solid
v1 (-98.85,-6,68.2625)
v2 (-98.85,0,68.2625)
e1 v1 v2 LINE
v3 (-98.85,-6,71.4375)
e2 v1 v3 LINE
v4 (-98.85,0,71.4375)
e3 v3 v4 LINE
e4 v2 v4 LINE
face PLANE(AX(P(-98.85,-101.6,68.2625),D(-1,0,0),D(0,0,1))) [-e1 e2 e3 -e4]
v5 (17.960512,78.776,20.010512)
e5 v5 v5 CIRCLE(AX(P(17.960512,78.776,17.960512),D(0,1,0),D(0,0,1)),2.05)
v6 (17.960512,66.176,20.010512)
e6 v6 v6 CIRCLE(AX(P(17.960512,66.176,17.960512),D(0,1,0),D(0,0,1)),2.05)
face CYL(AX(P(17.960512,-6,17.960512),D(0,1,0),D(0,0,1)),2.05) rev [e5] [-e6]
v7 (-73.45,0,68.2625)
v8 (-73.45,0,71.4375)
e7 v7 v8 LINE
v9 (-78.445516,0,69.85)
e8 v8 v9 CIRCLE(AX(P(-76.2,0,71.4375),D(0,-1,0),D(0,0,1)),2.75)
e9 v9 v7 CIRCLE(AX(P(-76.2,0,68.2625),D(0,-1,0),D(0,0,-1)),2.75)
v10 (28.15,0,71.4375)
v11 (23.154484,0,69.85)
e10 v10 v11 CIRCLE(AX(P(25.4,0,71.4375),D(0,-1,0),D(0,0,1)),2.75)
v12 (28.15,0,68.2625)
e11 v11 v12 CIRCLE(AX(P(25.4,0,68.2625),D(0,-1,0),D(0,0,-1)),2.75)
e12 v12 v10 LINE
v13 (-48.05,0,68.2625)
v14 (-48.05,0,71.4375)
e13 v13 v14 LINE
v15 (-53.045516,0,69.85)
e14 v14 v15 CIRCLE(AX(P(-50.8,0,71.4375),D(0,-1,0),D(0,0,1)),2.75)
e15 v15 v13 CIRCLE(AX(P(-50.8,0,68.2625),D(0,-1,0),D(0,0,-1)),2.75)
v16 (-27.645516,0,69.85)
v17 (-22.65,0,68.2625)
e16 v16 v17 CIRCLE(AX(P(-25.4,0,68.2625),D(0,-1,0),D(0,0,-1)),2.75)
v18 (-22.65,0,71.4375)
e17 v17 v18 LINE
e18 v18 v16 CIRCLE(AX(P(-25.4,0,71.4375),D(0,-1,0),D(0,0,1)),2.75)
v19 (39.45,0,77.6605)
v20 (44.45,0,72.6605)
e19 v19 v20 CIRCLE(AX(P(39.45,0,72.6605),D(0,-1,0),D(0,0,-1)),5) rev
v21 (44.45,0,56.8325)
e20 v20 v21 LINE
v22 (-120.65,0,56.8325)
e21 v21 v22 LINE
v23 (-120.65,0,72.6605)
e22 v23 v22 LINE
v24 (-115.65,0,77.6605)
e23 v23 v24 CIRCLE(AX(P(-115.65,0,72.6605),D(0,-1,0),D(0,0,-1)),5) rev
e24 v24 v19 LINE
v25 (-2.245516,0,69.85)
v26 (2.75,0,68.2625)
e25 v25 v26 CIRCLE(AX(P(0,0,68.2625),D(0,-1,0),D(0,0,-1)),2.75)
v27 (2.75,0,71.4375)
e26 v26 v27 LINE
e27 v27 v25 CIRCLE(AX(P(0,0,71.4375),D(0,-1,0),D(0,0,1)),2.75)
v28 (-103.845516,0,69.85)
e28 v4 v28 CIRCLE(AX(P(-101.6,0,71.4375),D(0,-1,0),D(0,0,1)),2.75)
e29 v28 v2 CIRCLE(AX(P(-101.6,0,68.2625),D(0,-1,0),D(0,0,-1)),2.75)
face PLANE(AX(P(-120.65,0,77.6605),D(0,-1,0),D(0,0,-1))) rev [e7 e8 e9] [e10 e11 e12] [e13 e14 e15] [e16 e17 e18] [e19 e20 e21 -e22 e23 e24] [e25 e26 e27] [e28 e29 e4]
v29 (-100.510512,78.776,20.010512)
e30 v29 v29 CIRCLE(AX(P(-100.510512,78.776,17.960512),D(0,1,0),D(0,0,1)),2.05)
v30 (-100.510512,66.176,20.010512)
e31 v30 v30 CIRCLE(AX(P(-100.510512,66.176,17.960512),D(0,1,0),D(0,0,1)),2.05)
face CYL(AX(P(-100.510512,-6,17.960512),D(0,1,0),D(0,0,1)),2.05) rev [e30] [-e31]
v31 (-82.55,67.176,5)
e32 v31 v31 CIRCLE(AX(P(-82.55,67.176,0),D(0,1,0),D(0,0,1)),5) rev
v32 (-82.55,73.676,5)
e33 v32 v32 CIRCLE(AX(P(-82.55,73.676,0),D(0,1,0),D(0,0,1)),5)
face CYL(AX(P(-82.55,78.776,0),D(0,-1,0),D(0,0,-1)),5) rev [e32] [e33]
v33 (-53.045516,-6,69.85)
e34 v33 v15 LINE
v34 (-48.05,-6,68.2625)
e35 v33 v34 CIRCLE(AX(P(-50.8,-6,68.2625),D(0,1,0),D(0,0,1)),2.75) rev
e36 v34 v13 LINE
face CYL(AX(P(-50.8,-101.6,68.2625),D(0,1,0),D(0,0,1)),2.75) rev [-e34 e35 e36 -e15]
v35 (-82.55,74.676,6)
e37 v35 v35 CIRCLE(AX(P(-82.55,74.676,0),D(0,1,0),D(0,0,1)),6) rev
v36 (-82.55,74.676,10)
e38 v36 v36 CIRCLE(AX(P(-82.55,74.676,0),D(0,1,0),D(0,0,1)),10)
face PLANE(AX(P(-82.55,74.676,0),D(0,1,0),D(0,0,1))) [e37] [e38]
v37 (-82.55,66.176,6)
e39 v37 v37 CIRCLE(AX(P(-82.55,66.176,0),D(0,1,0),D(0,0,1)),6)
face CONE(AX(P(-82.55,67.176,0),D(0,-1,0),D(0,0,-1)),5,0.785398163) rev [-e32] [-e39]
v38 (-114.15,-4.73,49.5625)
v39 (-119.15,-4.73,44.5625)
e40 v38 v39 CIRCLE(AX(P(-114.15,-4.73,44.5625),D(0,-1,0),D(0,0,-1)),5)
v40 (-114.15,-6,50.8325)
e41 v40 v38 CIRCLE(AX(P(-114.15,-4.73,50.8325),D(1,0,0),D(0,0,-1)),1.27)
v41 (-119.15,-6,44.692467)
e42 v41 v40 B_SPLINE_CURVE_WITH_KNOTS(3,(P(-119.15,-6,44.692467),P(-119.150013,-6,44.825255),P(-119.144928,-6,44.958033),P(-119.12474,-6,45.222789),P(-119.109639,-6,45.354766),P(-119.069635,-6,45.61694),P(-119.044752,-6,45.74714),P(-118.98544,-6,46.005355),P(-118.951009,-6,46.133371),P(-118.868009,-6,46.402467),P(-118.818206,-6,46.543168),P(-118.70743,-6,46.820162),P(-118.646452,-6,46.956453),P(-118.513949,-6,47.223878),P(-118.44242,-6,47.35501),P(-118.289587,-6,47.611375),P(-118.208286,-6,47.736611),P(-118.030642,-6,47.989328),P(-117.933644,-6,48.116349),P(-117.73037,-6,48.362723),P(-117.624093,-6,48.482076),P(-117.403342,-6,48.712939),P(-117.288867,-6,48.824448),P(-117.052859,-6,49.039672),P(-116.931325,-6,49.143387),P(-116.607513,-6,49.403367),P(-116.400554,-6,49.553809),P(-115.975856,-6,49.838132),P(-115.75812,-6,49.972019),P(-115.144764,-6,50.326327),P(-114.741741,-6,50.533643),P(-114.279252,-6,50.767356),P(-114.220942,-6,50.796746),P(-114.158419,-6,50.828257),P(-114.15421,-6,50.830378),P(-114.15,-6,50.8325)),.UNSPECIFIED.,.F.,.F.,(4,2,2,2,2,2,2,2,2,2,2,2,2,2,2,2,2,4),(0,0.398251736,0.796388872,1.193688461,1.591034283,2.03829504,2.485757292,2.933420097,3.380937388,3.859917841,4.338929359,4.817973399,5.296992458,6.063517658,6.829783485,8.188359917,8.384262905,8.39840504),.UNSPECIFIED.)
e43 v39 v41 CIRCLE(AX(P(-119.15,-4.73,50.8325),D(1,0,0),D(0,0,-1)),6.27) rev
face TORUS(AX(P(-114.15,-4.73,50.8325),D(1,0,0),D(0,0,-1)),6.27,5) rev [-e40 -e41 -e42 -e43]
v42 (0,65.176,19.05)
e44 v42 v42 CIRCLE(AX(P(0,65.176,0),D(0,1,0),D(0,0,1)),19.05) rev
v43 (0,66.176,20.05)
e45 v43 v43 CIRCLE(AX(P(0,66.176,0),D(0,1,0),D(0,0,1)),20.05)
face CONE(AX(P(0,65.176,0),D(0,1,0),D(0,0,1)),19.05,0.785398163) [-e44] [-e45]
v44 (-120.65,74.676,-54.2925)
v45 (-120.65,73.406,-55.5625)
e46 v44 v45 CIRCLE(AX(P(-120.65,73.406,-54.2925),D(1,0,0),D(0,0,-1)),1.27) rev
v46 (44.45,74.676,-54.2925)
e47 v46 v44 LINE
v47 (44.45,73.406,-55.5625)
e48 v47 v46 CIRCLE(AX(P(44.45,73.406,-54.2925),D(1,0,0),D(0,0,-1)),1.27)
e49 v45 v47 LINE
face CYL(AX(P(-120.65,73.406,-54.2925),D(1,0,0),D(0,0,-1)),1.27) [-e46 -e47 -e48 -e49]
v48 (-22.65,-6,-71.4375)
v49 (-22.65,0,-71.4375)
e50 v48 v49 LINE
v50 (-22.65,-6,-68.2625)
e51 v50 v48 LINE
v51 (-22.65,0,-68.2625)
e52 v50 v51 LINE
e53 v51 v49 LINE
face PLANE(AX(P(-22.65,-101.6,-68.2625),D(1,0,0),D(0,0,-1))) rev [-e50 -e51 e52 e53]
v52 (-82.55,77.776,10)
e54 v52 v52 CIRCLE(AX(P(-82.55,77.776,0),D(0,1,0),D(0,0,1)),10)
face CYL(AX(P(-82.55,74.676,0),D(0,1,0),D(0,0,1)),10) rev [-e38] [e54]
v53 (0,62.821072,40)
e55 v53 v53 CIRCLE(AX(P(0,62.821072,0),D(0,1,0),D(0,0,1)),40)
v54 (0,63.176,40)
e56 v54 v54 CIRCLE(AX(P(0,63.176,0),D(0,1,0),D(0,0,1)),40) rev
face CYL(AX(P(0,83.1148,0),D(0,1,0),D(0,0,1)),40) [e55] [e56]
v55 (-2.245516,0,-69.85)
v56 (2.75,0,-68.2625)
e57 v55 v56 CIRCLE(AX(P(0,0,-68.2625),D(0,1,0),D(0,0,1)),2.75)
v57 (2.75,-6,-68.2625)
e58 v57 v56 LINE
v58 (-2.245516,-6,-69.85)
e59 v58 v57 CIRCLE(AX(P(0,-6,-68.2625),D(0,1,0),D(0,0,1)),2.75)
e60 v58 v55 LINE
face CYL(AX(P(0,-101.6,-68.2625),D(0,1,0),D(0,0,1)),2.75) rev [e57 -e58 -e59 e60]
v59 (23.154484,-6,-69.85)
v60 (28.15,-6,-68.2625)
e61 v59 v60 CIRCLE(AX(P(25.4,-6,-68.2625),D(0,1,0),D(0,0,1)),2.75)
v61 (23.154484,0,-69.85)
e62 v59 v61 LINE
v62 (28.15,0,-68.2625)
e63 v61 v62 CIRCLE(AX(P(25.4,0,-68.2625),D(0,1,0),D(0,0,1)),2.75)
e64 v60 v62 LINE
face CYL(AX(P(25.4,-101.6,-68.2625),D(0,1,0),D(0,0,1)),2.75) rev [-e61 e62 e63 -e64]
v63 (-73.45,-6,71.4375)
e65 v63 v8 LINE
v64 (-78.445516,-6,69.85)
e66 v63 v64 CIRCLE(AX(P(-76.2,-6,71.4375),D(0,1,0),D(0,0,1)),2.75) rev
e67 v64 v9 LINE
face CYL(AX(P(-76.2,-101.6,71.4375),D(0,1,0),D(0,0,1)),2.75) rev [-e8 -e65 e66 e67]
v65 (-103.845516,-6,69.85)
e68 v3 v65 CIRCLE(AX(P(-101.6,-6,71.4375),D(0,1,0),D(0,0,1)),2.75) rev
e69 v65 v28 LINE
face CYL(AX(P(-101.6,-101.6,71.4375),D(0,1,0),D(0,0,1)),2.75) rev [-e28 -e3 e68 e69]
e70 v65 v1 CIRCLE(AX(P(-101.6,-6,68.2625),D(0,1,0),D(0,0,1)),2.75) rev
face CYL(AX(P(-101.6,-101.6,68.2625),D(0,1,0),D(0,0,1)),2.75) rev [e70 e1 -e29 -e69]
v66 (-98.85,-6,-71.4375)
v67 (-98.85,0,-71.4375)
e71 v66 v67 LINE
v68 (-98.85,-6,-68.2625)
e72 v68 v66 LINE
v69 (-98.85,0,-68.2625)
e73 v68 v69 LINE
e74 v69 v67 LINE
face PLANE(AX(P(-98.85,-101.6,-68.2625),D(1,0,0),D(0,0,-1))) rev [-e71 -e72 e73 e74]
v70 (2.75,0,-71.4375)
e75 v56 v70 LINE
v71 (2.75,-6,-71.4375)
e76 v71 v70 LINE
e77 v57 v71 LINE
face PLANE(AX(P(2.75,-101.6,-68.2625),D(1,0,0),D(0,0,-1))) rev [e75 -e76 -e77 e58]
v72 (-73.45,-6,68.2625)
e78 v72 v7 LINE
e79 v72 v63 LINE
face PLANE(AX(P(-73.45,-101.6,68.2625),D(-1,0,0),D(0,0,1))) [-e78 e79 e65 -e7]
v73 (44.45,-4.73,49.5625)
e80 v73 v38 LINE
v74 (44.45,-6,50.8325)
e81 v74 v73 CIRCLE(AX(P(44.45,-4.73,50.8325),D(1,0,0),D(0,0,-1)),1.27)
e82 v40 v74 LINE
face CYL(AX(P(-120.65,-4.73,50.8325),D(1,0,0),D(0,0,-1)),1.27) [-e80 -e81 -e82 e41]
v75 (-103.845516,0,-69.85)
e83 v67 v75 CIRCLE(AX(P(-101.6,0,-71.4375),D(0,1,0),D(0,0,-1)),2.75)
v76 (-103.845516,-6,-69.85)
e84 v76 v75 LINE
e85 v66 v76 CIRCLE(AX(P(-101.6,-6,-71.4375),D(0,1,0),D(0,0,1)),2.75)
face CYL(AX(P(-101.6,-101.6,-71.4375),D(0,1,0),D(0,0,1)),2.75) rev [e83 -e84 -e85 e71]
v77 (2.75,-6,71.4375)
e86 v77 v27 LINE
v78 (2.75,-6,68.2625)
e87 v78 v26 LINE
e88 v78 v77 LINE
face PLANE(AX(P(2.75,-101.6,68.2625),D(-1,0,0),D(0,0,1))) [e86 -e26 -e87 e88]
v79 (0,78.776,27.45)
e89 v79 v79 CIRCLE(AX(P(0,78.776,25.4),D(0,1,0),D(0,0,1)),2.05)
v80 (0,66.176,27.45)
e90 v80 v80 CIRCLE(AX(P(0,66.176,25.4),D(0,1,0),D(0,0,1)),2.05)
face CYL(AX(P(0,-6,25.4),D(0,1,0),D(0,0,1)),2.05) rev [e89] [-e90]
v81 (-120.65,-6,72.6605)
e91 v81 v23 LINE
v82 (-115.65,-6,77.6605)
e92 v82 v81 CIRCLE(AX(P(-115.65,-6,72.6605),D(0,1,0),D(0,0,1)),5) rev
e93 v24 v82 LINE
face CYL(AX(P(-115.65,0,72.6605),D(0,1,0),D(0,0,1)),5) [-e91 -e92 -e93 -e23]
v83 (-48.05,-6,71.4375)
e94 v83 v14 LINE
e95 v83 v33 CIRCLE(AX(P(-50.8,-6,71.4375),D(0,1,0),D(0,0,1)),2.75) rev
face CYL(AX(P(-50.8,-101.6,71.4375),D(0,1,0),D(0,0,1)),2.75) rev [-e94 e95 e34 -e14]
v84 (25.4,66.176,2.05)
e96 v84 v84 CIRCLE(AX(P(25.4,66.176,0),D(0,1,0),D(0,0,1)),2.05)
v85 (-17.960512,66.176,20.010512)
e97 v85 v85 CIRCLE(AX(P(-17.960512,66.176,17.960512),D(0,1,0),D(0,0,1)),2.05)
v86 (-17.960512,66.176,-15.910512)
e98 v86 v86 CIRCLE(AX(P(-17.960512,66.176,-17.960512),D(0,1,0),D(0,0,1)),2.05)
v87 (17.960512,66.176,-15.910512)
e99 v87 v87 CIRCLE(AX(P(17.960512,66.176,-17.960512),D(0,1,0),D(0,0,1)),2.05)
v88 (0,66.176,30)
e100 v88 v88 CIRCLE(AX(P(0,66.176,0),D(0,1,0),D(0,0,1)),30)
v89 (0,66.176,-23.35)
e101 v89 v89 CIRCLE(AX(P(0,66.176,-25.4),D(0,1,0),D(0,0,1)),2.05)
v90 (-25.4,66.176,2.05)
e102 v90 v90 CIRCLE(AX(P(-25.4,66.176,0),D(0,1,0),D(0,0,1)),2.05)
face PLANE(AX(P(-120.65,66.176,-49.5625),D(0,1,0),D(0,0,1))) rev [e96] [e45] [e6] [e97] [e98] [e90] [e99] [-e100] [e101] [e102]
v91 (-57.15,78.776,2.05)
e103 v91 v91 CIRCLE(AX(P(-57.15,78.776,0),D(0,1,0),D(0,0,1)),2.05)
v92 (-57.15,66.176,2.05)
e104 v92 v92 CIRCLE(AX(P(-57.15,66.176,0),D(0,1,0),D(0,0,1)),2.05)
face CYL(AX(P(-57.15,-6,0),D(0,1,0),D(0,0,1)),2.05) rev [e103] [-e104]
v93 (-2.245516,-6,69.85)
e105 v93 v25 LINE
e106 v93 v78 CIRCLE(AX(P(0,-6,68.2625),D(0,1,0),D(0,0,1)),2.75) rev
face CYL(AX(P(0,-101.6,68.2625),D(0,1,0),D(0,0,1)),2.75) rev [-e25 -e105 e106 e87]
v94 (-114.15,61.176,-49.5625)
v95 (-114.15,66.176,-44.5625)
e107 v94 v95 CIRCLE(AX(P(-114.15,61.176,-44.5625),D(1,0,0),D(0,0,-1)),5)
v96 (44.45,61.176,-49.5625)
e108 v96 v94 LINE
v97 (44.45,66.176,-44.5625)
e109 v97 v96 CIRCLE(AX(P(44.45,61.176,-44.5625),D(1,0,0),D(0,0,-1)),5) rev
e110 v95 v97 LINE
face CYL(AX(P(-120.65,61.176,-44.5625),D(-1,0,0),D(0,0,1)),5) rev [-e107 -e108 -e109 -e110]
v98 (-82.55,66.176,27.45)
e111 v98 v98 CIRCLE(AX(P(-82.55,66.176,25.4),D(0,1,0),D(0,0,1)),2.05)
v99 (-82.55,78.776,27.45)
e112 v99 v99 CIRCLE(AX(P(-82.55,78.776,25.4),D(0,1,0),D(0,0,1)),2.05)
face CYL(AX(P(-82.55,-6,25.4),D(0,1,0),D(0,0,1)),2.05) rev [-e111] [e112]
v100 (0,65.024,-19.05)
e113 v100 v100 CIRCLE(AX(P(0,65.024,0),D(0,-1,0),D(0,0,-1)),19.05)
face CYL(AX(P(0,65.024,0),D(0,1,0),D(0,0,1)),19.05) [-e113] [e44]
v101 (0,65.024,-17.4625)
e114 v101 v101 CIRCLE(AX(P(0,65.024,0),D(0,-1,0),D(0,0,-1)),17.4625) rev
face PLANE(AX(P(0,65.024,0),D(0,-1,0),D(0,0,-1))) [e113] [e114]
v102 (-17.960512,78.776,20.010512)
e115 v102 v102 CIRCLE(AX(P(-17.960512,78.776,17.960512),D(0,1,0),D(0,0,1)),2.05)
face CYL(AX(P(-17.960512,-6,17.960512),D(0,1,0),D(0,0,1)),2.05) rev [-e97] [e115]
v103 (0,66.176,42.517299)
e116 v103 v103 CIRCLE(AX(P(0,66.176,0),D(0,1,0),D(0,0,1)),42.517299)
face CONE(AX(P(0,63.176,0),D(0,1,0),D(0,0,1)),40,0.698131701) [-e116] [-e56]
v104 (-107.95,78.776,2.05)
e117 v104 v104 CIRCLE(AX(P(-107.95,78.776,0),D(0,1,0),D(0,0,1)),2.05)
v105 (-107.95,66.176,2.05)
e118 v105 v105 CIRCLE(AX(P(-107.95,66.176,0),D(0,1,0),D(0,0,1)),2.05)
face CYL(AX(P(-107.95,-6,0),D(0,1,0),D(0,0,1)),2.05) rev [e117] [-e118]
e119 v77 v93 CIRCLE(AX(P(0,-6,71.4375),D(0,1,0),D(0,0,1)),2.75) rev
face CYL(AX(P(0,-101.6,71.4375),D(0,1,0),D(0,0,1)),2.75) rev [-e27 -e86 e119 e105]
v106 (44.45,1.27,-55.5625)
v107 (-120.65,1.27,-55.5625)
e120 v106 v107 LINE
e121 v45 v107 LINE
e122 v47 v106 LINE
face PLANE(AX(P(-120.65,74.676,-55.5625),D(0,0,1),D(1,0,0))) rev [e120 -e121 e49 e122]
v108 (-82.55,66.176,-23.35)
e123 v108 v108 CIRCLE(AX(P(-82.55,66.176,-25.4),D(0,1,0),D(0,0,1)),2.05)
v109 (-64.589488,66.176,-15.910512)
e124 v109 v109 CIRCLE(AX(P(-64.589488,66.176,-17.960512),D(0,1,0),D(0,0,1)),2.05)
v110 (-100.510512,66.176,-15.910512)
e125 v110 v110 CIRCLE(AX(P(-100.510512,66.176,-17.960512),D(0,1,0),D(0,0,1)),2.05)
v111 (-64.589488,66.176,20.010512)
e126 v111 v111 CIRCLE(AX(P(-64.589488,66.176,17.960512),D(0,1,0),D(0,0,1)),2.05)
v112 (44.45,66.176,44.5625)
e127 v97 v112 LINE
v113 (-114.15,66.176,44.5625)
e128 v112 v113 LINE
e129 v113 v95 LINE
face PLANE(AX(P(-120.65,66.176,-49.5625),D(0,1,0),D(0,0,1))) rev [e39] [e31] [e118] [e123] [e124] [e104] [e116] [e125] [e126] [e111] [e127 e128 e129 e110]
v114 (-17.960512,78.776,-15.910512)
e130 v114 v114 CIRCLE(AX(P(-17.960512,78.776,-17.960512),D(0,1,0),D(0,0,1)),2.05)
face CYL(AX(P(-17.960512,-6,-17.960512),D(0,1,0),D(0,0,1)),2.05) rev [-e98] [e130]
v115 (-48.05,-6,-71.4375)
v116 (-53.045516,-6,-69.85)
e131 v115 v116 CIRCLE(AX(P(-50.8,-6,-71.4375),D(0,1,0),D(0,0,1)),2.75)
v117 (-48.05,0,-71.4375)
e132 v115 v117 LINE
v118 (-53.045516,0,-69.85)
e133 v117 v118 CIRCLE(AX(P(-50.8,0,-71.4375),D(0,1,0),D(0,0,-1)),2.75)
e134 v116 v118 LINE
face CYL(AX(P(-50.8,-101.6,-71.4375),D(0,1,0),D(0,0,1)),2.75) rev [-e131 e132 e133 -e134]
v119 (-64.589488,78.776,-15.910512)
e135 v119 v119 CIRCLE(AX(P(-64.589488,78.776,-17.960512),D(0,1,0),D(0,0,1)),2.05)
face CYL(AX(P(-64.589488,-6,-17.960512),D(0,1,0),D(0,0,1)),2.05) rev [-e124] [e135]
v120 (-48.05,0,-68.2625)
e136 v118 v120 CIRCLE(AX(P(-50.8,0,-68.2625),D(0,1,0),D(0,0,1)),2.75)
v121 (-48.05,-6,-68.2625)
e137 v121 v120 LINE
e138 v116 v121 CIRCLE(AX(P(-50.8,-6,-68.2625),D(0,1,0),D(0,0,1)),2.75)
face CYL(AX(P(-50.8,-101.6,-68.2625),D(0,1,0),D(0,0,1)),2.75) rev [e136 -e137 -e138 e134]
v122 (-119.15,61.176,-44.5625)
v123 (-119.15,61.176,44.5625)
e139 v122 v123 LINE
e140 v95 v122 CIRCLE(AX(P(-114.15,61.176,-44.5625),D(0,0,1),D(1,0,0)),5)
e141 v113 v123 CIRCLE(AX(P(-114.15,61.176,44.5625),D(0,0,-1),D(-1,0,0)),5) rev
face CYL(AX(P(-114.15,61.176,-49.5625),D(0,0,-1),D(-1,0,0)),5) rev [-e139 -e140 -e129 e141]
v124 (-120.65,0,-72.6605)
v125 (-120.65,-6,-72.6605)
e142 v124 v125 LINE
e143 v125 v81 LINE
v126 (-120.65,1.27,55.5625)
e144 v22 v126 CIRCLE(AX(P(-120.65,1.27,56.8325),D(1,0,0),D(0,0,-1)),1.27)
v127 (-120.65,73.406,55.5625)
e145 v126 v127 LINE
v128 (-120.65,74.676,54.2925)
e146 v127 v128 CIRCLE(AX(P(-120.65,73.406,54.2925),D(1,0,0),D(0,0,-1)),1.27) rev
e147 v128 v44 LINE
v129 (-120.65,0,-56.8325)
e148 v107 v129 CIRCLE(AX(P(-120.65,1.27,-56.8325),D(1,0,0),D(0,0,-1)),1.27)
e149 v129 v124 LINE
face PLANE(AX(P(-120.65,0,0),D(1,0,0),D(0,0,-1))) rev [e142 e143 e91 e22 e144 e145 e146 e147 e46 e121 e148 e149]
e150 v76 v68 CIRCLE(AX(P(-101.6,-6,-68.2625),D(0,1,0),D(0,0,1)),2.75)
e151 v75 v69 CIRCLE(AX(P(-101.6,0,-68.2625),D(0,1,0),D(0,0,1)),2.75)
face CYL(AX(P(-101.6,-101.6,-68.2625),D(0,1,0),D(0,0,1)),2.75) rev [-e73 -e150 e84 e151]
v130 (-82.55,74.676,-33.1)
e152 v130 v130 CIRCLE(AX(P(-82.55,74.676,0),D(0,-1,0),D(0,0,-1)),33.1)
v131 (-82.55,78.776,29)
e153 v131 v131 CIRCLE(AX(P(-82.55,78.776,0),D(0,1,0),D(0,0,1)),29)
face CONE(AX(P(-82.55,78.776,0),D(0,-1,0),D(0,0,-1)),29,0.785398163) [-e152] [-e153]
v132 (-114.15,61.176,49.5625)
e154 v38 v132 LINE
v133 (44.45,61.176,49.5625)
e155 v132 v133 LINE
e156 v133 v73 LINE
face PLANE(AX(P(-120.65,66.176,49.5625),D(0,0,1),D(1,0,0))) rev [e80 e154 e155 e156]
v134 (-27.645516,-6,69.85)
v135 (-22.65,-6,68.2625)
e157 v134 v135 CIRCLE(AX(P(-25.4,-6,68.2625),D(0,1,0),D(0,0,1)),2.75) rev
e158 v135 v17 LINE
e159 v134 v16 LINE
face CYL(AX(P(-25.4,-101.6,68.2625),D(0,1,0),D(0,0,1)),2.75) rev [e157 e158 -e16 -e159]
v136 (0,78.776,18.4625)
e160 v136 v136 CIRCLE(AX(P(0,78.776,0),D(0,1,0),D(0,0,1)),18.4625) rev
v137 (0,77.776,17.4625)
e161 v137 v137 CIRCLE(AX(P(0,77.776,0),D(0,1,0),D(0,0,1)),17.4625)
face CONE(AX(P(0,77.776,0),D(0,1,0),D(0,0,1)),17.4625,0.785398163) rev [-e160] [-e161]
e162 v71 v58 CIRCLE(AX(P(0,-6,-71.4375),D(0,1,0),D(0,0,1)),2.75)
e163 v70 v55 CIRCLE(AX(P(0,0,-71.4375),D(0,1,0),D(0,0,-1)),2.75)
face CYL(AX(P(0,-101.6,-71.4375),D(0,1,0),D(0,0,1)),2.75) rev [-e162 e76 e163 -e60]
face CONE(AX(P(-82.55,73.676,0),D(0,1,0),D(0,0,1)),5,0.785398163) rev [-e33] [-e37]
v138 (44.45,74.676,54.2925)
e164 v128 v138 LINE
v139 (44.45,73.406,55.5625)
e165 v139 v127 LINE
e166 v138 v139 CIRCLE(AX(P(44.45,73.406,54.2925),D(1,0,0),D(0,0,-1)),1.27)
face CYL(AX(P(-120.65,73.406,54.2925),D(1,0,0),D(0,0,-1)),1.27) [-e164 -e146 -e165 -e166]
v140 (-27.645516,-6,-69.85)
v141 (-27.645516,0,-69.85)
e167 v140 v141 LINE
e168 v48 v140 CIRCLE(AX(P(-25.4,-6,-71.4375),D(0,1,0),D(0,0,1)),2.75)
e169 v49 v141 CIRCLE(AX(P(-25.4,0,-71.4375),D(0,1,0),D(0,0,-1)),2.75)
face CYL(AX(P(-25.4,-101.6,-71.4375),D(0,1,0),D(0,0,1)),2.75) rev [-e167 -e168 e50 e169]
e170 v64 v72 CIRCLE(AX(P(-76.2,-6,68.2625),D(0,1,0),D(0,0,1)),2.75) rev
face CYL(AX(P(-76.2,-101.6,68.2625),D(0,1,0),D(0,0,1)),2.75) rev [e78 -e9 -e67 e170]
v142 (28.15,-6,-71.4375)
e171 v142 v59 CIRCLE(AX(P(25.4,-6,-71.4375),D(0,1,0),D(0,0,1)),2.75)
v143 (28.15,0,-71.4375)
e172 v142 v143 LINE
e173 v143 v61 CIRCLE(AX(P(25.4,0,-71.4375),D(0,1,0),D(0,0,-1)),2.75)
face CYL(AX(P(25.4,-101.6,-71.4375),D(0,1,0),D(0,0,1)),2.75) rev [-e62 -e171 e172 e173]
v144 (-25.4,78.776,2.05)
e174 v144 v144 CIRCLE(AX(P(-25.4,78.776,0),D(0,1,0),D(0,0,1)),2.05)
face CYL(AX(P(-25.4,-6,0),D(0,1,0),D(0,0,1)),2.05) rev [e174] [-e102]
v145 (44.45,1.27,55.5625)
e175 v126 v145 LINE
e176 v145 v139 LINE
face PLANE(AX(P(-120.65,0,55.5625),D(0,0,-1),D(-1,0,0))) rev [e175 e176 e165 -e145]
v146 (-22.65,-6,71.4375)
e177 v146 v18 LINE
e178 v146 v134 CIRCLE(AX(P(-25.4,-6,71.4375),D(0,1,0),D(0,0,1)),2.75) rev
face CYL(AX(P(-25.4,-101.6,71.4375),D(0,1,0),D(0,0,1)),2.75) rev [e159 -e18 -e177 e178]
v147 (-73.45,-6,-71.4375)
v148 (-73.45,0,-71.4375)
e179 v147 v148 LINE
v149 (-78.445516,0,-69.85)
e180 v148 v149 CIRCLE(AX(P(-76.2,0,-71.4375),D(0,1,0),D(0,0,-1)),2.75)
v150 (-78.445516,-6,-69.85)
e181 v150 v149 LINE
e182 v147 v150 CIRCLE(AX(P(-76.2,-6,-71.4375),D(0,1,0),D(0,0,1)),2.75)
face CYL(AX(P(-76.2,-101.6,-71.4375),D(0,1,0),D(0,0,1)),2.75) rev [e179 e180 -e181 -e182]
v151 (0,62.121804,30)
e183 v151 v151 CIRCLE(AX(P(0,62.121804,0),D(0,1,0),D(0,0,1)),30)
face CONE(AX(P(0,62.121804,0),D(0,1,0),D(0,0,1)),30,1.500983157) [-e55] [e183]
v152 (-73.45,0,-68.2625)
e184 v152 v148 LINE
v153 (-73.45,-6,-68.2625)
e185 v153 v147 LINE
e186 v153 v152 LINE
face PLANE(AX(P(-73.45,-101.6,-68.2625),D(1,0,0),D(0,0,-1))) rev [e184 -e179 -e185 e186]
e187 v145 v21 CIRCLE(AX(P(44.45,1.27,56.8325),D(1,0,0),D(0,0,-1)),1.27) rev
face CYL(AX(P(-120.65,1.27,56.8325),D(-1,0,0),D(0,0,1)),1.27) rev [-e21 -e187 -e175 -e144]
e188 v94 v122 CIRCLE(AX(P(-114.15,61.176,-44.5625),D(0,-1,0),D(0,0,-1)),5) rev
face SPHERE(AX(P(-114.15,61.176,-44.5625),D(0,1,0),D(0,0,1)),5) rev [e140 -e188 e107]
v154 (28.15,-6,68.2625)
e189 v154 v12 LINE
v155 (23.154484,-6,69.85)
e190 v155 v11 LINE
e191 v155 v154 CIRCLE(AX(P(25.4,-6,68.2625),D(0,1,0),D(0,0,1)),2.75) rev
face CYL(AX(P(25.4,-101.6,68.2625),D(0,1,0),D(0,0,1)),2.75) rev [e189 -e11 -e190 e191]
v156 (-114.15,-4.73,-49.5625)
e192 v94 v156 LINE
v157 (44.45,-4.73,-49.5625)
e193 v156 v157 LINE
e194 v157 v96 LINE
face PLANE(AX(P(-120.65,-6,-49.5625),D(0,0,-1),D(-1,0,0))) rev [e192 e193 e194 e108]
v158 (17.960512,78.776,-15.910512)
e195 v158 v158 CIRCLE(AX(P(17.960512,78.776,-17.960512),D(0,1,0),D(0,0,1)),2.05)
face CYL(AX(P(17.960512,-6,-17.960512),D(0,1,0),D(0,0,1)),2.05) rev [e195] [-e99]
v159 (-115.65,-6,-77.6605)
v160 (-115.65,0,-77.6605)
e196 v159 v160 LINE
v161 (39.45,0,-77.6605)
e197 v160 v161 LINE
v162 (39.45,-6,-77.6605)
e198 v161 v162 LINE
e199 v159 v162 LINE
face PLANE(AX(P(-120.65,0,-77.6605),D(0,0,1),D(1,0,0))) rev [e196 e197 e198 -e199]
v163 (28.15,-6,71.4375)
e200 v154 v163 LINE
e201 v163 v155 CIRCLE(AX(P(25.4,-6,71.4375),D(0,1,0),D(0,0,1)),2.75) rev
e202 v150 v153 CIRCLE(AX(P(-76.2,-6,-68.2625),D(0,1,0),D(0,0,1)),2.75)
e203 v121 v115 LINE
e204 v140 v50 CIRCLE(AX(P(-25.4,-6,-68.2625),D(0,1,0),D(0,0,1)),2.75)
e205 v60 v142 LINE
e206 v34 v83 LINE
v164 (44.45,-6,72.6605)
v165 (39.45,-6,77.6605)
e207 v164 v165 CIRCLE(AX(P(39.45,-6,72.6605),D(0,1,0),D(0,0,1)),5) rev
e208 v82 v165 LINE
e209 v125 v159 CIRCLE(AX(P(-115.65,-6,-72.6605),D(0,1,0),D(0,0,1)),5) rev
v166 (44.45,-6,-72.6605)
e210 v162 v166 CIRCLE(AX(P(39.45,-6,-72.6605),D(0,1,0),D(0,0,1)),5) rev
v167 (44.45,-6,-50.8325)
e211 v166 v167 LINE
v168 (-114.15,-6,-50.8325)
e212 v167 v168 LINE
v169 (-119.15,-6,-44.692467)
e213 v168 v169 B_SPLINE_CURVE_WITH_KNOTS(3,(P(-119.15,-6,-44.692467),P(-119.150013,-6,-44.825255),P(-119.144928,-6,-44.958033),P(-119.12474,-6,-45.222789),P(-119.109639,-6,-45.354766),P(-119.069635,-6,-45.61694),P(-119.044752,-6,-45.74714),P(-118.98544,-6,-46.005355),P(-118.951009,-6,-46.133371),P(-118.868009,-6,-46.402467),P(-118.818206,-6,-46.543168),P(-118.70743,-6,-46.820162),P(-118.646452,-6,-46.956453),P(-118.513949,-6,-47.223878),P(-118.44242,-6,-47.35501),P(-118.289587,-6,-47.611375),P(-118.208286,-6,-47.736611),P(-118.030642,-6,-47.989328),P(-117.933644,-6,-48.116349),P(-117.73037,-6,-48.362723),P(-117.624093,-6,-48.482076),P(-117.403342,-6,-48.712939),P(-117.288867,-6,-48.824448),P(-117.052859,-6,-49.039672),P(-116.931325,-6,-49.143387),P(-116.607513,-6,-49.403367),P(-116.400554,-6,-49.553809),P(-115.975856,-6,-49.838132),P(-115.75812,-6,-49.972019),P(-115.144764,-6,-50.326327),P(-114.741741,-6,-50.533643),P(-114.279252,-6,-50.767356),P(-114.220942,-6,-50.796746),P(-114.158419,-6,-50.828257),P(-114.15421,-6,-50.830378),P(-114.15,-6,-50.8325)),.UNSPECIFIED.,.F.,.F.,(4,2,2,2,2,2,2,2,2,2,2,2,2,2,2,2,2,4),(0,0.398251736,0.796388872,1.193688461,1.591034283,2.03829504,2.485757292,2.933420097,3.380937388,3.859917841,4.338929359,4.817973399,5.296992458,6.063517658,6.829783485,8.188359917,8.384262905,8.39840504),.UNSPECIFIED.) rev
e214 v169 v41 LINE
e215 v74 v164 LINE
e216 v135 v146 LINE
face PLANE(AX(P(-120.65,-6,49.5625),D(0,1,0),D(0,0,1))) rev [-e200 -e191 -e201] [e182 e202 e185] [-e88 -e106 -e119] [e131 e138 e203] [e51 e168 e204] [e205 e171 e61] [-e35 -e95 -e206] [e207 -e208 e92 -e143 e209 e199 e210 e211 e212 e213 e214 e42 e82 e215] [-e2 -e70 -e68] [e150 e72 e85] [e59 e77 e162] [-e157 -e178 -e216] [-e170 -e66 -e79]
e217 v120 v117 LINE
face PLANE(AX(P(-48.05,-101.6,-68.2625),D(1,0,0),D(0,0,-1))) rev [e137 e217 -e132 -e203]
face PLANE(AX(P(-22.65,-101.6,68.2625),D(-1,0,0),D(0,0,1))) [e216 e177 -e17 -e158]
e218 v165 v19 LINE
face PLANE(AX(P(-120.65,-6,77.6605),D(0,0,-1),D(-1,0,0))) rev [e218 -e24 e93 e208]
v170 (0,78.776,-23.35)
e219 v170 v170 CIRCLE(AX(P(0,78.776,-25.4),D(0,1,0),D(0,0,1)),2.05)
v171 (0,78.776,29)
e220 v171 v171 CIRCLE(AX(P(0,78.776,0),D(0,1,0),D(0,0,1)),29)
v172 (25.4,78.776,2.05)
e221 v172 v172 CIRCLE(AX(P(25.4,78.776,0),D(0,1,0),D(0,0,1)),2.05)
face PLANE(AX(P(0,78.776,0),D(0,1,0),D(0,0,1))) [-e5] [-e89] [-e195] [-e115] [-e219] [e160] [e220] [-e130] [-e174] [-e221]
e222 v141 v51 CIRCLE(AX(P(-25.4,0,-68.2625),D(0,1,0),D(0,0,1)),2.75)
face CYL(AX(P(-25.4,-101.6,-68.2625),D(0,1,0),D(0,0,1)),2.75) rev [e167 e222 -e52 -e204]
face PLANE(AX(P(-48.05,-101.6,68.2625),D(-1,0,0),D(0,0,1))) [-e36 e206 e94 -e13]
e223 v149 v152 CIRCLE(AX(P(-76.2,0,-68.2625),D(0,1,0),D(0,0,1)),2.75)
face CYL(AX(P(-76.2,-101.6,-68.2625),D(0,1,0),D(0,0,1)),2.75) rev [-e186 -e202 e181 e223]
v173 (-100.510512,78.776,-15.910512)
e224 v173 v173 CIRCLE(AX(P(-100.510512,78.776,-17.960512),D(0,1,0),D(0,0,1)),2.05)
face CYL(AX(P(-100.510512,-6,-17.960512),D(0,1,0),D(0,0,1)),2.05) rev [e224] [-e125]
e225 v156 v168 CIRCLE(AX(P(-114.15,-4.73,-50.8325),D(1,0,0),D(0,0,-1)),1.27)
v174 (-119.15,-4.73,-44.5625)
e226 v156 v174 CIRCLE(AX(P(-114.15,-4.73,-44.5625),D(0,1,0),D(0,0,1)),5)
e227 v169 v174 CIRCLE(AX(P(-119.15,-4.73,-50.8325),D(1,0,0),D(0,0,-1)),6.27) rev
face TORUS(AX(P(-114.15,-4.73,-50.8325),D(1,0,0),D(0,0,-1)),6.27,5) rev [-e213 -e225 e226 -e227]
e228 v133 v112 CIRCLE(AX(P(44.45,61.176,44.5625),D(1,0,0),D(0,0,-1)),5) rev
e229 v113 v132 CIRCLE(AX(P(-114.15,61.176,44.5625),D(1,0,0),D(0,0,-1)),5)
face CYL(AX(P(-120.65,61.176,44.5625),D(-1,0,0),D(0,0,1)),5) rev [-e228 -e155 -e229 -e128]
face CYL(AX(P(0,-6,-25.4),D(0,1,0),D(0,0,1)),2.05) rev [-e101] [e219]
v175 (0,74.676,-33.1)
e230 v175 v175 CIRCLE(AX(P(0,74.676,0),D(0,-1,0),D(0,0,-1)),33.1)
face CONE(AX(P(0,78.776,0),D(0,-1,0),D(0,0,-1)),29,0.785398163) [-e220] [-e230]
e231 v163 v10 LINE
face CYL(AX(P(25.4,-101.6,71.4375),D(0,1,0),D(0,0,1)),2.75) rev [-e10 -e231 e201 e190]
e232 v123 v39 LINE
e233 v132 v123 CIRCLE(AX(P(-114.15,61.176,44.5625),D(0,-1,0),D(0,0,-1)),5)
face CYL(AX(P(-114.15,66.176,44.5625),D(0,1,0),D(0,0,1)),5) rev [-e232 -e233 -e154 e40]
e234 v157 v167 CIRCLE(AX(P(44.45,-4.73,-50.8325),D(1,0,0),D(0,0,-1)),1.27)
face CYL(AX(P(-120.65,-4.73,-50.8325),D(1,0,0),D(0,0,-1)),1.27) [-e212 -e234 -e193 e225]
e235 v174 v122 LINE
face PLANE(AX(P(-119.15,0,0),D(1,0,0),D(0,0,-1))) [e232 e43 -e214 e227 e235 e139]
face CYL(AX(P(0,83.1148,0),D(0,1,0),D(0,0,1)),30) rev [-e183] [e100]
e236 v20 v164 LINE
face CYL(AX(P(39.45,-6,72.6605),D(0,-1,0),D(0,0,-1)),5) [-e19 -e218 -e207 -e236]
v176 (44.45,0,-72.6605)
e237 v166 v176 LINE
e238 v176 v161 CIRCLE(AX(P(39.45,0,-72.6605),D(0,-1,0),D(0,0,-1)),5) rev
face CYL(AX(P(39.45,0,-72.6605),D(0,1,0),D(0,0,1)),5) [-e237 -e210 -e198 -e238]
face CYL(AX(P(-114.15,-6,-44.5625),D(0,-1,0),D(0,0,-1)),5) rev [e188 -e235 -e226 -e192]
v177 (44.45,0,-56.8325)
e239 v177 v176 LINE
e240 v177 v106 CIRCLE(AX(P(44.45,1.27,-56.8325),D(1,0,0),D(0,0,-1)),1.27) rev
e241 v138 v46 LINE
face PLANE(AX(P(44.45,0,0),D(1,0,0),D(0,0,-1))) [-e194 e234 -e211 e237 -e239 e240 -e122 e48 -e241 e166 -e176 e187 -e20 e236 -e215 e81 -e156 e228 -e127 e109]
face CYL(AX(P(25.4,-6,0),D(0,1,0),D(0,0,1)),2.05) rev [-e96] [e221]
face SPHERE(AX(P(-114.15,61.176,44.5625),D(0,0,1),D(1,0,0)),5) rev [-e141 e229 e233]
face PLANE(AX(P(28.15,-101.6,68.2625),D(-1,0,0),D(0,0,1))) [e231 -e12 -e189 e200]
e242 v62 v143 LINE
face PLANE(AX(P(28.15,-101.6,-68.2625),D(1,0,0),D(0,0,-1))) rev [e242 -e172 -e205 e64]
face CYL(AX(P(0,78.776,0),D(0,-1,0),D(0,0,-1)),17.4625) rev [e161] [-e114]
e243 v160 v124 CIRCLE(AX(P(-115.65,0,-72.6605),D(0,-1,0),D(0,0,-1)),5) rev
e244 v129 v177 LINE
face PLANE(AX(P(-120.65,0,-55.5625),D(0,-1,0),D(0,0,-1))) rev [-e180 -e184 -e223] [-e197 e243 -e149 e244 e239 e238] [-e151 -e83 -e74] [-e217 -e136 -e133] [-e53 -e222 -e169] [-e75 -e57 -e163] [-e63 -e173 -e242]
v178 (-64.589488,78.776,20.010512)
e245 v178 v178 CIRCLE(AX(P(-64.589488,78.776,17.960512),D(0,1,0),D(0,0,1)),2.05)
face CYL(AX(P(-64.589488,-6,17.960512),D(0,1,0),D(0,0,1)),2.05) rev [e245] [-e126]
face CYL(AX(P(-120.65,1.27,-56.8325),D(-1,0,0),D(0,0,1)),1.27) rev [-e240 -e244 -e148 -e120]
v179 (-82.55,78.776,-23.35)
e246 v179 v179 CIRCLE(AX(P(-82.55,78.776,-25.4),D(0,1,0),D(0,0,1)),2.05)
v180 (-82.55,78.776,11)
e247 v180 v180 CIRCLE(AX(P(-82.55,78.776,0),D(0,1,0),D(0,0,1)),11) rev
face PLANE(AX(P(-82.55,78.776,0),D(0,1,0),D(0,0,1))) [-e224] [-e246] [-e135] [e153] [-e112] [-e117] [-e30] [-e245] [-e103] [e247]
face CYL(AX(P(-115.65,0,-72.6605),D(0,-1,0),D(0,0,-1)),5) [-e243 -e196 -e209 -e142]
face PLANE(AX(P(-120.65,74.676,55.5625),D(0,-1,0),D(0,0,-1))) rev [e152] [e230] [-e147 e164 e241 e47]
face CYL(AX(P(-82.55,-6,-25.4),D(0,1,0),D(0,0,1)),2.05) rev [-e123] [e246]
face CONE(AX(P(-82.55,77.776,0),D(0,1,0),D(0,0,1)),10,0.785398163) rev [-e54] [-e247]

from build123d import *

# Parameters (mm, degrees)
BOSS_EXTRUDE1_DEPTH        = 44.45
BOSS_EXTRUDE1_DEPTH_BACK   = 120.65
SKETCH5_W                  = 99.125
SKETCH5_H                  = 72.176
BOSS_EXTRUDE2_DEPTH        = 1.5
CUT_EXTRUDE1_DEPTH         = 101.6
SKETCH12_R                 = 29
BOSS_EXTRUDE3_DEPTH        = 4.1
CHAMFER1_SIZE              = 4.1
SKETCH10_R                 = 2.05
CUT_EXTRUDE2_DEPTH         = 164.686388977
BOSS_EXTRUDE4_START        = -8.5
SKETCH17_R                 = 19.05
BOSS_EXTRUDE4_DEPTH        = 9.652
SKETCH13_R                 = 17.4625
CUT_EXTRUDE4_DEPTH         = 164.686388977
CHAMFER3_SIZE              = 1
LPATTERN1_COUNT            = 2
LPATTERN1_PITCH            = 82.55
CHAMFER1_OF_LPATTERN1_SIZE = 4.1
SKETCH14_R                 = 5
CUT_EXTRUDE5_DEPTH         = 164.686388977
SKETCH15_R                 = 10
CUT_EXTRUDE6_DEPTH         = 4.1
FILLET1_R                  = 1.27
FILLET3_R                  = 5
CHAMFER4_SIZE              = 1
CHAMFER5_SIZE              = 3
CHAMFER5_SIZE2             = 2.517298894


# Some blends are built 0.0001 mm under size
with BuildPart() as part:
    # Sketch2 → Boss-Extrude1 (new, two sides: drawn at the far end of the back side and taken through both)
    with BuildSketch(Plane(origin=(0, 0, 0), x_dir=(0, 0, -1), z_dir=(1, 0, 0)).offset(-BOSS_EXTRUDE1_DEPTH_BACK)):
        Polygon((-77.6605, 0), (-55.5625, 0), (-55.5625, 74.676), (55.5625, 74.676), (55.5625, 0), (77.6605, 0), (77.6605, -6), (49.5625, -6), (49.5625, 66.176), (-49.5625, 66.176), (-49.5625, -6), (-77.6605, -6), align=None)
    extrude(amount=BOSS_EXTRUDE1_DEPTH + BOSS_EXTRUDE1_DEPTH_BACK)

    # Sketch5 → Boss-Extrude2 (add)
    with BuildSketch(Plane.ZY.offset(120.65)):
        with Locations((0, 30.088)):
            Rectangle(SKETCH5_W, SKETCH5_H)
    extrude(amount=-BOSS_EXTRUDE2_DEPTH)

    # Sketch4 → Cut-Extrude1 (cut)
    with BuildSketch(Plane(origin=(0, 0, 0), x_dir=(1, 0, 0), z_dir=(0, 1, 0))):
        with BuildLine():
            Line((-98.85, 68.2625), (-98.85, 71.4375))
            ThreePointArc((-98.85, 71.4375), (-102.432865533, 74.058346238), (-103.845516366, 69.85))
            ThreePointArc((-103.845516366, 69.85), (-102.432865533, 65.641653762), (-98.85, 68.2625))
        make_face()
        with BuildLine():
            Line((-73.45, 68.2625), (-73.45, 71.4375))
            ThreePointArc((-73.45, 71.4375), (-77.032865533, 74.058346238), (-78.445516366, 69.85))
            ThreePointArc((-78.445516366, 69.85), (-77.032865533, 65.641653762), (-73.45, 68.2625))
        make_face()
        with BuildLine():
            Line((-48.05, 68.2625), (-48.05, 71.4375))
            ThreePointArc((-48.05, 71.4375), (-51.632865533, 74.058346238), (-53.045516366, 69.85))
            ThreePointArc((-53.045516366, 69.85), (-51.632865533, 65.641653762), (-48.05, 68.2625))
        make_face()
        with BuildLine():
            Line((-22.65, 68.2625), (-22.65, 71.4375))
            ThreePointArc((-22.65, 71.4375), (-26.232865533, 74.058346238), (-27.645516366, 69.85))
            ThreePointArc((-27.645516366, 69.85), (-26.232865533, 65.641653762), (-22.65, 68.2625))
        make_face()
        with BuildLine():
            Line((2.75, 68.2625), (2.75, 71.4375))
            ThreePointArc((2.75, 71.4375), (-0.832865533, 74.058346238), (-2.245516366, 69.85))
            ThreePointArc((-2.245516366, 69.85), (-0.832865533, 65.641653762), (2.75, 68.2625))
        make_face()
        with BuildLine():
            Line((28.15, 68.2625), (28.15, 71.4375))
            ThreePointArc((28.15, 71.4375), (24.567134467, 74.058346238), (23.154483634, 69.85))
            ThreePointArc((23.154483634, 69.85), (24.567134467, 65.641653762), (28.15, 68.2625))
        make_face()
    cut_extrude1 = extrude(amount=-CUT_EXTRUDE1_DEPTH, mode=Mode.SUBTRACT)

    # Mirror1: Cut-Extrude1 across plane
    add(cut_extrude1.mirror(Plane.XY), mode=Mode.SUBTRACT)

    # Sketch12 → Boss-Extrude3 (add)
    with BuildSketch(Plane(origin=(0, 74.676, 0), x_dir=(1, 0, 0), z_dir=(0, 1, 0))):
        with Locations(Location((0, 0, 0), (0, 0, 270))):
            Circle(SKETCH12_R)
    boss_extrude3 = extrude(amount=BOSS_EXTRUDE3_DEPTH)

    # Chamfer1
    chamfer1_edges = [part.edges().sort_by_distance(p)[0] for p in [
        (0, 74.676, -29),
    ]]
    chamfer(chamfer1_edges, length=CHAMFER1_SIZE - 0.0001)  # a hair under: the kernel refuses the full size

    # Sketch10 → Cut-Extrude2 (cut, symmetric)
    with BuildSketch(Plane(origin=(0, 0, 0), x_dir=(1, 0, 0), z_dir=(0, 1, 0))):
        with Locations(Location((17.960512242, 17.960512242, 0), (0, 0, 270))):
            Circle(SKETCH10_R)
        with Locations(Location((25.4, 0, 0), (0, 0, 270))):
            Circle(SKETCH10_R)
        with Locations(Location((17.960512242, -17.960512242, 0), (0, 0, 270))):
            Circle(SKETCH10_R)
        with Locations(Location((0, -25.4, 0), (0, 0, 270))):
            Circle(SKETCH10_R)
        with Locations(Location((-17.960512242, -17.960512242, 0), (0, 0, 270))):
            Circle(SKETCH10_R)
        with Locations(Location((-25.4, 0, 0), (0, 0, 270))):
            Circle(SKETCH10_R)
        with Locations(Location((-17.960512242, 17.960512242, 0), (0, 0, 270))):
            Circle(SKETCH10_R)
        with Locations(Location((0, 25.4, 0), (0, 0, 270))):
            Circle(SKETCH10_R)
    cut_extrude2 = extrude(amount=CUT_EXTRUDE2_DEPTH, both=True, mode=Mode.SUBTRACT)

    # Sketch17 → Boss-Extrude4 (add)
    with BuildSketch(Plane.XZ.offset(-66.176).offset(BOSS_EXTRUDE4_START)):
        with Locations(Location((0, 0, 0), (0, 0, 90))):
            Circle(SKETCH17_R)
    extrude(amount=BOSS_EXTRUDE4_DEPTH)

    # Sketch13 → Cut-Extrude4 (cut, through all)
    with BuildSketch(Plane(origin=(0, 0, 0), x_dir=(1, 0, 0), z_dir=(0, 1, 0))):
        with Locations(Location((0, 0, 0), (0, 0, 90))):
            Circle(SKETCH13_R)
    extrude(amount=CUT_EXTRUDE4_DEPTH, mode=Mode.SUBTRACT)

    # Chamfer3
    chamfer3_edges = [part.edges().sort_by_distance(p)[0] for p in [
        (0, 66.176, -19.05),
    ]]
    chamfer(chamfer3_edges, length=CHAMFER3_SIZE)

    # LPattern1: Boss-Extrude3, Cut-Extrude2 ×2
    with Locations(*[(-i * LPATTERN1_PITCH, 0, 0) for i in range(1, LPATTERN1_COUNT)]):
        add(boss_extrude3)
        add(cut_extrude2, mode=Mode.SUBTRACT)

    # Chamfer1 of LPattern1
    chamfer1_of_lpattern1_edges = [part.edges().sort_by_distance(p)[0] for p in [
        (-82.55, 74.676, -29),
    ]]
    chamfer(chamfer1_of_lpattern1_edges, length=CHAMFER1_OF_LPATTERN1_SIZE - 0.0001)  # a hair under: the kernel refuses the full size

    # Sketch14 → Cut-Extrude5 (cut, through all)
    with BuildSketch(Plane(origin=(0, 0, 0), x_dir=(1, 0, 0), z_dir=(0, 1, 0))):
        with Locations(Location((-82.55, 0, 0), (0, 0, 270))):
            Circle(SKETCH14_R)
    extrude(amount=CUT_EXTRUDE5_DEPTH, mode=Mode.SUBTRACT)

    # Sketch15 → Cut-Extrude6 (cut)
    with BuildSketch(Plane(origin=(0, 78.776, 0), x_dir=(1, 0, 0), z_dir=(0, 1, 0))):
        with Locations(Location((-82.55, 0, 0), (0, 0, 270))):
            Circle(SKETCH15_R)
    extrude(amount=-CUT_EXTRUDE6_DEPTH, mode=Mode.SUBTRACT)

    # Fillet1
    fillet1_edges = [part.edges().sort_by_distance(p)[0] for p in [
        (-38.1, 0, -55.5625),
        (-38.1, 74.676, -55.5625),
        (-38.1, 74.676, 55.5625),
        (-38.1, 0, 55.5625),
        (-37.35, -6, 49.5625),
        (-37.35, -6, -49.5625),
    ]]
    fillet(fillet1_edges, radius=FILLET1_R)

    # Fillet3
    # the kernel refuses this fillet: 5 mm, written as the material it adds along each edge
    with BuildSketch(Plane(origin=(-114.15, 61.176, 44.5625), x_dir=(0, 1, 0), z_dir=(-1, 0, 0))) as fillet3_piece_1_section:
        Polygon((0, 0), (FILLET3_R * 1.02, 0), (FILLET3_R * 1.02, -FILLET3_R * 1.02), (0, -FILLET3_R * 1.02), align=None)
    fillet3_piece_1 = extrude(amount=FILLET3_R * 1.02, mode=Mode.PRIVATE)
    fillet3_piece_1 = fillet3_piece_1 - Plane(origin=(-114.15, 61.176, 44.5625), x_dir=(0, -0.7071067811865475, -0.7071067811865475), z_dir=(-1, 0, 0)) * Sphere(FILLET3_R, mode=Mode.PRIVATE)
    add(fillet3_piece_1)
    with BuildSketch(Plane(origin=(-114.15, 61.176, -44.5625), x_dir=(-1, 0, 0), z_dir=(0, 1, 0))) as fillet3_piece_2_section:
        Polygon((0, 0), (FILLET3_R * 1.02, 0), (FILLET3_R * 1.02, -FILLET3_R * 1.02), (0, -FILLET3_R * 1.02), align=None)
    fillet3_piece_2 = extrude(amount=FILLET3_R * 1.02, mode=Mode.PRIVATE)
    fillet3_piece_2 = fillet3_piece_2 - Plane(origin=(-114.15, 61.176, -44.5625), x_dir=(0.7071067811865475, 0, 0.7071067811865475), z_dir=(0, 1, 0)) * Sphere(FILLET3_R, mode=Mode.PRIVATE)
    add(fillet3_piece_2)
    with BuildSketch(Plane(origin=(-119.15, -4.73, 49.5625), x_dir=(1, 0, 0), z_dir=(0, 1, 0))) as fillet3_piece_3:
        with BuildLine():
            CenterArc((FILLET3_R, FILLET3_R), FILLET3_R, 180, 90)
            Line((0, FILLET3_R), (0, 0))
            Line((0, 0), (FILLET3_R, 0))
        make_face()
    extrude(amount=65.906)
    with BuildSketch(Plane(origin=(-119.15, -4.73, -50.8325), x_dir=(0, 0.006283143965557515, 0.9999802608561371), z_dir=(0, -0.9999802608561371, 0.006283143965557515))) as fillet3_piece_4_section:
        with BuildLine():
            CenterArc((-1.27 - FILLET3_R, -FILLET3_R), FILLET3_R, 0, 90)
            Line((-1.27 - FILLET3_R, 0), (-1.27, 0))
            Line((-1.27, 0), (-1.27, -FILLET3_R))
        make_face()
    fillet3_piece_4 = revolve(axis=Axis((-119.15, -4.73, -50.8325), (-1, 0, 0)), revolution_arc=359.64, mode=Mode.PRIVATE)
    fillet3_piece_4 = split(fillet3_piece_4, bisect_by=Plane(origin=(-117.187917089, -6, -49.859640049), z_dir=(0, 1, 0)), keep=Keep.TOP, mode=Mode.PRIVATE)
    add(fillet3_piece_4)
    with BuildSketch(Plane(origin=(-119.15, -4.73, 50.8325), x_dir=(0, 0.006283143965559613, -0.9999802608561371), z_dir=(0, -0.9999802608561371, -0.006283143965559613))) as fillet3_piece_5_section:
        with BuildLine():
            CenterArc((-1.27 - FILLET3_R, FILLET3_R), FILLET3_R, 270, 90)
            Line((-1.27 - FILLET3_R, 0), (-1.27, 0))
            Line((-1.27, 0), (-1.27, FILLET3_R))
        make_face()
    fillet3_piece_5 = revolve(axis=Axis((-119.15, -4.73, 50.8325), (1, 0, 0)), revolution_arc=359.64, mode=Mode.PRIVATE)
    fillet3_piece_5 = split(fillet3_piece_5, bisect_by=Plane(origin=(-117.187917089, -6, 49.85964009), z_dir=(0, 1, 0)), keep=Keep.TOP, mode=Mode.PRIVATE)
    add(fillet3_piece_5)
    with BuildSketch(Plane(origin=(44.45, 66.176, 49.5625), x_dir=(0, 0, -1), z_dir=(-1, 0, 0))) as fillet3_piece_6:
        with BuildLine():
            CenterArc((FILLET3_R, FILLET3_R), FILLET3_R, 180, 90)
            Line((0, FILLET3_R), (0, 0))
            Line((0, 0), (FILLET3_R, 0))
        make_face()
    extrude(amount=158.6)
    with BuildSketch(Plane(origin=(44.45, 66.176, -49.5625), x_dir=(0, 0, 1), z_dir=(-1, 0, 0))) as fillet3_piece_7:
        with BuildLine():
            CenterArc((FILLET3_R, -FILLET3_R), FILLET3_R, 90, 90)
            Line((0, -FILLET3_R), (0, 0))
            Line((0, 0), (FILLET3_R, 0))
        make_face()
    extrude(amount=158.6)
    with BuildSketch(Plane(origin=(-119.15, 61.176, -49.5625), x_dir=(0, 0, 1), z_dir=(0, -1, 0))) as fillet3_piece_8:
        with BuildLine():
            CenterArc((FILLET3_R, -FILLET3_R), FILLET3_R, 90, 90)
            Line((0, -FILLET3_R), (0, 0))
            Line((0, 0), (FILLET3_R, 0))
        make_face()
    extrude(amount=65.906)
    with BuildSketch(Plane(origin=(-119.15, 66.176, 44.5625), x_dir=(1, 0, 0), z_dir=(0, 0, -1))) as fillet3_piece_9:
        with BuildLine():
            CenterArc((FILLET3_R, FILLET3_R), FILLET3_R, 180, 90)
            Line((0, FILLET3_R), (0, 0))
            Line((0, 0), (FILLET3_R, 0))
        make_face()
    extrude(amount=89.125)
    # the kernel refuses this fillet: 5 mm, written as the material it takes off along each edge
    with BuildSketch(Plane(origin=(-120.65, 12.5, -77.6605), x_dir=(0, 0, 1), z_dir=(0, -1, 0)), Plane(origin=(-120.65, -18.5, 77.6605), x_dir=(0, 0, -1), z_dir=(0, 1, 0))) as fillet3_2_piece_1:
        with BuildLine():
            CenterArc((FILLET3_R, -FILLET3_R), FILLET3_R, 90, 90)
            Line((0, -FILLET3_R), (0, 0))
            Line((0, 0), (FILLET3_R, 0))
        make_face()
    extrude(amount=31, mode=Mode.SUBTRACT)
    with BuildSketch(Plane(origin=(44.45, -18.5, 77.6605), x_dir=(0, 0, -1), z_dir=(0, 1, 0)), Plane(origin=(44.45, 12.5, -77.6605), x_dir=(0, 0, 1), z_dir=(0, -1, 0))) as fillet3_2_piece_2:
        with BuildLine():
            CenterArc((FILLET3_R, FILLET3_R), FILLET3_R, 180, 90)
            Line((0, FILLET3_R), (0, 0))
            Line((0, 0), (FILLET3_R, 0))
        make_face()
    extrude(amount=31, mode=Mode.SUBTRACT)

    # Chamfer4
    chamfer4_edges = [part.edges().sort_by_distance(p)[0] for p in [
        (0, 78.776, 17.4625),
        (-82.55, 66.176, -5),
        (-82.55, 74.676, -5),
        (-82.55, 78.776, -10),
    ]]
    chamfer(chamfer4_edges, length=CHAMFER4_SIZE)

    # Sketch19 → Revolve1 (revolve)
    with BuildSketch(Plane(origin=(0, 0, 0), x_dir=(0, 0, -1), z_dir=(1, 0, 0)), mode=Mode.PRIVATE) as revolve1_sk:
        Polygon((30, 66.176), (30, 62.121804358), (40, 62.821072478), (40, 66.176), align=None)
    revolve(revolve1_sk.sketch.rotate(Axis((0, 83.1148, 0), (0, -1, 0)), 180), axis=Axis((0, 83.1148, 0), (0, -1, 0)))

    # Chamfer5
    chamfer5_edges = [part.edges().sort_by_distance(p)[0] for p in [
        (0, 66.176, -40),
    ]]
    chamfer5_side = [part.faces().sort_by_distance(p)[0] for p in [
        (0, 64.498536239, -40),
    ]]
    chamfer(chamfer5_edges, length=CHAMFER5_SIZE, length2=CHAMFER5_SIZE2, reference=chamfer5_side[0])


solid = part.part
